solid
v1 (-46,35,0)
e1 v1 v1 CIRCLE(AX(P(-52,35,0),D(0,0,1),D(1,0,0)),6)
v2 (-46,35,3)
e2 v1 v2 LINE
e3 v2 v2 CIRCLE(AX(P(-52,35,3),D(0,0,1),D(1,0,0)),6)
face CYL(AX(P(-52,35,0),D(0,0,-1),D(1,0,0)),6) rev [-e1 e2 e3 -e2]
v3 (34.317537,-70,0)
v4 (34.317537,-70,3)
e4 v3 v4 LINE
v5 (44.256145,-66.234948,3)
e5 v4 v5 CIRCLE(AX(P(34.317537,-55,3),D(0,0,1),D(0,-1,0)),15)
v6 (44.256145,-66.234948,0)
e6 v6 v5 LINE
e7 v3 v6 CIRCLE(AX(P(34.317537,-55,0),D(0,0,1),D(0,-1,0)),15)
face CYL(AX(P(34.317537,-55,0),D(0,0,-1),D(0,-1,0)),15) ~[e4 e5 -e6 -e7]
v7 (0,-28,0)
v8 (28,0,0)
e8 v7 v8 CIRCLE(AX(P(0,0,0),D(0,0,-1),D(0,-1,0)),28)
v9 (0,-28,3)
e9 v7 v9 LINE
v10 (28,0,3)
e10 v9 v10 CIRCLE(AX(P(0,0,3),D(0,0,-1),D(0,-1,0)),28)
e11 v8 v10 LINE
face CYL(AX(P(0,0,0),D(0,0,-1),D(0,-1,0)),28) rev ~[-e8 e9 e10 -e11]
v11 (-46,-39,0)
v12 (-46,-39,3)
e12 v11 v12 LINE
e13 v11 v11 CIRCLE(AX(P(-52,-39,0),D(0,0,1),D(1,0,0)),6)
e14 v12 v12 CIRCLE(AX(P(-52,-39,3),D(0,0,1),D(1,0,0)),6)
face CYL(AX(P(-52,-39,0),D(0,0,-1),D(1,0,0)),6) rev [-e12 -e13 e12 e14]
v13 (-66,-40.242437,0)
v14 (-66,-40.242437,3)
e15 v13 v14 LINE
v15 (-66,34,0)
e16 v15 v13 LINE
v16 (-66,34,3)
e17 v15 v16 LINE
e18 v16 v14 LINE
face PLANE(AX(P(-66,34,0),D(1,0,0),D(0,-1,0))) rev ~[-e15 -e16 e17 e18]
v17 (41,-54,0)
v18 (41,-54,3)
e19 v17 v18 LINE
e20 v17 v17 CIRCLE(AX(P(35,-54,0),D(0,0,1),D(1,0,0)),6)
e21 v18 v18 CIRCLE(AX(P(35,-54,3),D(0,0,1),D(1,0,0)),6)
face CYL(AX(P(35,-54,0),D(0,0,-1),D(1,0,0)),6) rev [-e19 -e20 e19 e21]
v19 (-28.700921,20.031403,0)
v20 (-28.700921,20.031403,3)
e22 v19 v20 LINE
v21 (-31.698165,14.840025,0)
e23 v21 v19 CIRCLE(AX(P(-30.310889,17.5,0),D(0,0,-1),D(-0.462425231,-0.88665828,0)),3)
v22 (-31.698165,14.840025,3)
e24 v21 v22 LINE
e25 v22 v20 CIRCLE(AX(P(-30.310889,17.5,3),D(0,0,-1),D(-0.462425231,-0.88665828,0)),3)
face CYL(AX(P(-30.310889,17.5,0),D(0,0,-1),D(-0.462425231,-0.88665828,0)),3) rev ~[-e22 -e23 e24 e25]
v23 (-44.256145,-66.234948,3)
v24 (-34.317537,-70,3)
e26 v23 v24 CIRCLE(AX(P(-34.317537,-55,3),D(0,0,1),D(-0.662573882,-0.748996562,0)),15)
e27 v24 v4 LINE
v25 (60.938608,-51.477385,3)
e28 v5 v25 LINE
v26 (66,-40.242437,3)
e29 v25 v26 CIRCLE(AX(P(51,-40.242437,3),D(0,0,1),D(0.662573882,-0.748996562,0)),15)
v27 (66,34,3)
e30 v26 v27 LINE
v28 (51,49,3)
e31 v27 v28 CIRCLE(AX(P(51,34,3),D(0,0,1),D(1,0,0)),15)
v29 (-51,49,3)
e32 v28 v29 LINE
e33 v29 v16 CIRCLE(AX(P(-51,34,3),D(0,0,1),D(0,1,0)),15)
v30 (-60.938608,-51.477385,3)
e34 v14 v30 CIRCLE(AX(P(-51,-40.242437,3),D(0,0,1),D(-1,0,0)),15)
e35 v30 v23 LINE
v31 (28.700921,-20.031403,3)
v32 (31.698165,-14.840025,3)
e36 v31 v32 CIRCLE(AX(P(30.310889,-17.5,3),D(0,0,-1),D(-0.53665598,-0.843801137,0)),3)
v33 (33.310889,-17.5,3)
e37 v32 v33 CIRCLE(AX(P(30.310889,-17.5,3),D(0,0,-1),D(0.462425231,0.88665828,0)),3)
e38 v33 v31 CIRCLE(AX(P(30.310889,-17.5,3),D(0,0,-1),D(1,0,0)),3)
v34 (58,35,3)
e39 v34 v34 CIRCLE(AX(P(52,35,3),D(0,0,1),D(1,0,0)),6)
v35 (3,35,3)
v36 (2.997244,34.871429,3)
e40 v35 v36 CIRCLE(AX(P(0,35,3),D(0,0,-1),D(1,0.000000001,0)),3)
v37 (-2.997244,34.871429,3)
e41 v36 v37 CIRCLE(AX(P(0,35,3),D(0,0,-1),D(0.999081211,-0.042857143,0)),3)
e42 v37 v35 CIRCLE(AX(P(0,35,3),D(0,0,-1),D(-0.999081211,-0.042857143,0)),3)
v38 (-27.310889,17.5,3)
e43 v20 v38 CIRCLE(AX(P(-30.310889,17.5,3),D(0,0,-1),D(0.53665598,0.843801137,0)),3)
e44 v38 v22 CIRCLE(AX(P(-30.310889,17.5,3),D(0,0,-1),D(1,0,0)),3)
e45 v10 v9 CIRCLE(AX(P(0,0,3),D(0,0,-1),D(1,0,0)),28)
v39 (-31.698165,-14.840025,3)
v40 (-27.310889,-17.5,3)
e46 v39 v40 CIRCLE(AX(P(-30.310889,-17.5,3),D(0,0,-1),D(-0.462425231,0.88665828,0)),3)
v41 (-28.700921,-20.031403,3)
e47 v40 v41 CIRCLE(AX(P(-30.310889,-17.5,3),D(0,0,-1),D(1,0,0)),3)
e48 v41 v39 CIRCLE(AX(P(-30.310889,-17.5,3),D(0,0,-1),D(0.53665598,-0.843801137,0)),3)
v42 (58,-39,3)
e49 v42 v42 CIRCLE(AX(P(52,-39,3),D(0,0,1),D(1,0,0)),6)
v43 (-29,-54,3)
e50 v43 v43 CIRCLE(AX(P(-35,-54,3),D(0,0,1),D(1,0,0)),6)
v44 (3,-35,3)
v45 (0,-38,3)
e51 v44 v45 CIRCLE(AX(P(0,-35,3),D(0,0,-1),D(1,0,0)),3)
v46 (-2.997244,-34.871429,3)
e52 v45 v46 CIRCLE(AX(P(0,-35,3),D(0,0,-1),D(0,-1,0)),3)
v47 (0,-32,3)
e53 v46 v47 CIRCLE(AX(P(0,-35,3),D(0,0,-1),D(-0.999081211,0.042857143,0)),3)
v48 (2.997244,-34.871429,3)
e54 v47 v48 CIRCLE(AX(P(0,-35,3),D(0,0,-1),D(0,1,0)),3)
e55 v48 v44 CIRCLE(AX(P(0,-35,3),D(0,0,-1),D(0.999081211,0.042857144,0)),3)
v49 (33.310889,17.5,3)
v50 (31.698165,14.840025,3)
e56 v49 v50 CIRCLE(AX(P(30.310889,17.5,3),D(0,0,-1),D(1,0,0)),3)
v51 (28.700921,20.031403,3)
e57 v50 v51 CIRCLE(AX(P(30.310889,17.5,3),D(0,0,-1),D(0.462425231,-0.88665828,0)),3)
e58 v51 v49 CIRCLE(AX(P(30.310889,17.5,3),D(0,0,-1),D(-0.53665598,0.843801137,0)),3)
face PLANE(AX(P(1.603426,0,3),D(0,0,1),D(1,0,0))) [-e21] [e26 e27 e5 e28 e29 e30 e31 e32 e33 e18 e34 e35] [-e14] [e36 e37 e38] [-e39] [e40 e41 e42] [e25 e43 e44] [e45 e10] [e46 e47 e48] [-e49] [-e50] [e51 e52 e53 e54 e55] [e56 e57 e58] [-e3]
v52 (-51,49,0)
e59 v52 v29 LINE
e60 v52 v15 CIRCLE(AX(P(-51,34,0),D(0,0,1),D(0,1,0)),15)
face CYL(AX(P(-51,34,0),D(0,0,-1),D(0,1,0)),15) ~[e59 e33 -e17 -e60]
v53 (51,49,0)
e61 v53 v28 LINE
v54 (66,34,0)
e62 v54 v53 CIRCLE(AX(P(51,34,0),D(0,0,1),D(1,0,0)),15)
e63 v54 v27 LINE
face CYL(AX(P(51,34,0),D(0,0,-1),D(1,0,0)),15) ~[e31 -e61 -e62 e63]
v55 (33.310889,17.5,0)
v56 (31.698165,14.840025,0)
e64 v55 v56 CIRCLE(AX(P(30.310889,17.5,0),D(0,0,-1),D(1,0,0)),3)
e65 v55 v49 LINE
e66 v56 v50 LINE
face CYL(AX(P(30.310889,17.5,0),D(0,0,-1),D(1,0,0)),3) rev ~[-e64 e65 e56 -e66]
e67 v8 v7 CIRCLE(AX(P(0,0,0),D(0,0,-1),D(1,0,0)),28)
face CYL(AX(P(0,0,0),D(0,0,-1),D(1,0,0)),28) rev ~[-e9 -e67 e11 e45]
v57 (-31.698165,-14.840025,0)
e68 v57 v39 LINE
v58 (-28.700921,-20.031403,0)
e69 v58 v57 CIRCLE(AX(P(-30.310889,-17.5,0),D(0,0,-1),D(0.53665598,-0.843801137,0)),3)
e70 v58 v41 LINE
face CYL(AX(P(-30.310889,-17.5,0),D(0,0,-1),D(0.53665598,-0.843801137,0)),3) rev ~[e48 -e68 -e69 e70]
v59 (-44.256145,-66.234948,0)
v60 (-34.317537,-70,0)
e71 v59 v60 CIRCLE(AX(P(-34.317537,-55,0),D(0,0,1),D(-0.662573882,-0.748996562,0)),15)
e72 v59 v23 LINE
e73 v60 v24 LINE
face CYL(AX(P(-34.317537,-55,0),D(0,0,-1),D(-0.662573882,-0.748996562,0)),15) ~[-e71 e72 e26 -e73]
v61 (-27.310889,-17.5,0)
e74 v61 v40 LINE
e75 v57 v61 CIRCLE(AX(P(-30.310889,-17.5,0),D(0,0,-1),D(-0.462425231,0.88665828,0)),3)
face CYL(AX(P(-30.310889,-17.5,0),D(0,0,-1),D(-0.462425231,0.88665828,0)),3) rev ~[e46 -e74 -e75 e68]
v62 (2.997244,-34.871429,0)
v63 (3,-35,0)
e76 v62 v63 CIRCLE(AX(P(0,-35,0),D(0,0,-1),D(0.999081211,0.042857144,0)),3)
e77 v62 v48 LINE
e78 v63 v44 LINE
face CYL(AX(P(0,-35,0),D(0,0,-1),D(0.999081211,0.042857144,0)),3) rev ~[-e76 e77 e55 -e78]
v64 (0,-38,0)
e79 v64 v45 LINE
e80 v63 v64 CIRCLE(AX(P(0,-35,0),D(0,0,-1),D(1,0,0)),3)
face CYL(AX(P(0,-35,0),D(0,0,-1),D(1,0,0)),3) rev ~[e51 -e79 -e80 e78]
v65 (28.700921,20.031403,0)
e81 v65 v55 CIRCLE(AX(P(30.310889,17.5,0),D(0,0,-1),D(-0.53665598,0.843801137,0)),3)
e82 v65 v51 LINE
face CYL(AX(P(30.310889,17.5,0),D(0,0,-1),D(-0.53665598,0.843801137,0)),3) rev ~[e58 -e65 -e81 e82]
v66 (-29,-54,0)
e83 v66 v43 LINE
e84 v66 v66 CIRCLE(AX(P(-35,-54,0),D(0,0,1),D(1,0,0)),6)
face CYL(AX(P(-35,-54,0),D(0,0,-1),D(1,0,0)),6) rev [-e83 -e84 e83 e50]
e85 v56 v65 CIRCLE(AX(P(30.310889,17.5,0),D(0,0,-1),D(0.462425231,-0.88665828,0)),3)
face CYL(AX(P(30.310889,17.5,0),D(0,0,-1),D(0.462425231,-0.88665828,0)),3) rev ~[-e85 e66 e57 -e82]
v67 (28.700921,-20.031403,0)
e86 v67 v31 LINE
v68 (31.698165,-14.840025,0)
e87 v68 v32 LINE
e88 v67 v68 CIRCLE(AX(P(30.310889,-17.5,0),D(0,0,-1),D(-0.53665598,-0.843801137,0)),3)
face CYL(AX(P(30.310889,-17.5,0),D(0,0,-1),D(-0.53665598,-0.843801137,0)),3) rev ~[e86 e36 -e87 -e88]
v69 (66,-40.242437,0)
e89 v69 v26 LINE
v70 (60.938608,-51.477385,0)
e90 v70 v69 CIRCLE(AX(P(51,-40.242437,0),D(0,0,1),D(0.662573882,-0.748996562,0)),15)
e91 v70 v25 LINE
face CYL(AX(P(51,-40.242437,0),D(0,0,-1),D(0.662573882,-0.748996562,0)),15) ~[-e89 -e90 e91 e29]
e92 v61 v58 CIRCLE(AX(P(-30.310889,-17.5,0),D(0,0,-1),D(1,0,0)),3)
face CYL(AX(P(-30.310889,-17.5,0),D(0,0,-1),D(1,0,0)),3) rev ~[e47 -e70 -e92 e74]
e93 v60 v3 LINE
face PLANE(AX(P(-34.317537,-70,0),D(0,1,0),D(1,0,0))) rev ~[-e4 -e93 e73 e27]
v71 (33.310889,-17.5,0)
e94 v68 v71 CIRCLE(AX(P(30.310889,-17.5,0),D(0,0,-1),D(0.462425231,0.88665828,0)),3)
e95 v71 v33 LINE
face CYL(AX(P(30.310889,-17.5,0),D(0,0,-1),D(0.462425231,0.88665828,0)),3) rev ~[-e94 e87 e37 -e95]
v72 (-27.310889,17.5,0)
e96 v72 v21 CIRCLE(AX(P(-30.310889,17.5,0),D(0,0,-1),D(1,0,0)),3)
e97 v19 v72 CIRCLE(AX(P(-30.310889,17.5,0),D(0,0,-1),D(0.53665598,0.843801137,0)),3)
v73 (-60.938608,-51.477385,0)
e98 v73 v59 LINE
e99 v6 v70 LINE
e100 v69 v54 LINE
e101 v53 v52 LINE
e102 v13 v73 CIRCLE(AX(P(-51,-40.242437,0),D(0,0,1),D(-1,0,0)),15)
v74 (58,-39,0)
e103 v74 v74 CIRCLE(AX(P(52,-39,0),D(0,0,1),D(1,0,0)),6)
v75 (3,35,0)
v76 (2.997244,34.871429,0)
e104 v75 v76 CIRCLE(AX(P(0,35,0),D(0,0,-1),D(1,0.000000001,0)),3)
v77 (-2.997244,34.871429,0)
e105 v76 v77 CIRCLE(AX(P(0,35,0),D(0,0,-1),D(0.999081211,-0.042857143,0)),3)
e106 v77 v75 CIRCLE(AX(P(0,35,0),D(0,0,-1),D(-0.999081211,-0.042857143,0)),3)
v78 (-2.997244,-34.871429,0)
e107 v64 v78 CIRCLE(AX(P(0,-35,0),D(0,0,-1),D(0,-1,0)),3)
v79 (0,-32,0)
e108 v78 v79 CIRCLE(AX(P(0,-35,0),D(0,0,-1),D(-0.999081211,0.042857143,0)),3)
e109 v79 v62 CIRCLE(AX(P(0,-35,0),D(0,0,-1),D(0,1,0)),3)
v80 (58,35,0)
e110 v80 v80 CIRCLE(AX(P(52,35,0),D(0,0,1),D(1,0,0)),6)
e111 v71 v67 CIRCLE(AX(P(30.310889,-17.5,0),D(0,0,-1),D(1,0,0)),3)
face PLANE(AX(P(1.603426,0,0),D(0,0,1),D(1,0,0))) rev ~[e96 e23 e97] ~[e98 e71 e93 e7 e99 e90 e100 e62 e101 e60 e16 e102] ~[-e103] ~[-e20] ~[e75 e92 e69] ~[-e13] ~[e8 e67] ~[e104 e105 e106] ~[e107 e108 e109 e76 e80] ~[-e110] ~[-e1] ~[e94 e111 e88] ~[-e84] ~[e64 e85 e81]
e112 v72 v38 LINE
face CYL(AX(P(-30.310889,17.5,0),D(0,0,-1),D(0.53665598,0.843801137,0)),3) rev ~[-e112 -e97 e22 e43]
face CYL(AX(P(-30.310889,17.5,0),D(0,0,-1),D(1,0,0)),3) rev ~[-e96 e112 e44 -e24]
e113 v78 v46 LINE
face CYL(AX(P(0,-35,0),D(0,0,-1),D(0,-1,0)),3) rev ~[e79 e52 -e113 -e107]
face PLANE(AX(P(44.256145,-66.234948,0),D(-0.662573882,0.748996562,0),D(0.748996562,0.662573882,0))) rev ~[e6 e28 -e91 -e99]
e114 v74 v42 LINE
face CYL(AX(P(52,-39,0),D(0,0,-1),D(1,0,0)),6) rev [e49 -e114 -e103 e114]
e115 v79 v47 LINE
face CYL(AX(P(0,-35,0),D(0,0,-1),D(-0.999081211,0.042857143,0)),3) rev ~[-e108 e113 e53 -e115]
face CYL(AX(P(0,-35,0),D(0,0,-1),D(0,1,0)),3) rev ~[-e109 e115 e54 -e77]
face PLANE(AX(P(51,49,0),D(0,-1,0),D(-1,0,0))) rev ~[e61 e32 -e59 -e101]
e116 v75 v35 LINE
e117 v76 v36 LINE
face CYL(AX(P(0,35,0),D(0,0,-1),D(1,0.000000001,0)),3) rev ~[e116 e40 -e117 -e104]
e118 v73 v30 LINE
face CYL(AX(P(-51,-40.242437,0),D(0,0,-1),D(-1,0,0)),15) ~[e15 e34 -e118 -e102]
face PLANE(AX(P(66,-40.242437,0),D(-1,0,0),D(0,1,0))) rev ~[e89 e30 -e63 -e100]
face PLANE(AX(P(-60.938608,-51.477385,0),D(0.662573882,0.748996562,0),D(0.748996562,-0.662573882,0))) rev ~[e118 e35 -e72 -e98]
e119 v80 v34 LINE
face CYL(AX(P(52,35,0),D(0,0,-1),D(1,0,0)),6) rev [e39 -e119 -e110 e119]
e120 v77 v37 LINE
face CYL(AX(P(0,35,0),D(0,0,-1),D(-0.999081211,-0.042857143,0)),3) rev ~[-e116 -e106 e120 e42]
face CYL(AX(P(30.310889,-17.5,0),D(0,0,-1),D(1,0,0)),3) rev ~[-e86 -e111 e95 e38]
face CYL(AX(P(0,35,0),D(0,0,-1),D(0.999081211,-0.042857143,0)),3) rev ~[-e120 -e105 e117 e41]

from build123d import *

# Parameters (mm, degrees)
F0_R     = 9
F0_R_2   = 6
F1_DEPTH = 3


# Not quite as in the source:
# - a feature names something its author has since deleted; it is built from what else it names


with BuildPart() as f1:
    # F0 (on Top) → F1 (new body)
    with BuildSketch(Plane.XY):
        with BuildLine():
            ThreePointArc((0, 49), (-49, 0), (0, -49))
            ThreePointArc((0, -49), (34.6482322781, -34.6482322781), (49, 0))
            ThreePointArc((49, 0), (34.6482322781, 34.6482322781), (0, 49))
        make_face()
        with BuildLine():
            ThreePointArc((31.698164825, 14.8400251593), (34.1645706023, 7.601454832), (35, 0))
            ThreePointArc((35, 0), (34.1645706023, -7.601454832), (31.698164825, -14.8400251593))
            ThreePointArc((31.698164825, -14.8400251593), (32.8762182612, -15.9446587316), (33.3108891325, -17.5))
            ThreePointArc((33.3108891325, -17.5), (31.7548586928, -20.1296296144), (28.7009211933, -20.0314034121))
            ThreePointArc((28.7009211933, -20.0314034121), (17.5, -30.3108891325), (2.9972436317, -34.8714285714))
            ThreePointArc((2.9972436317, -34.8714285714), (2.9993108288, -34.9356995144), (3, -35))
            ThreePointArc((3, -35), (2.1213203436, -37.1213203436), (0, -38))
            ThreePointArc((0, -38), (-2.1663003353, -37.0753657165), (-2.9972436317, -34.8714285714))
            ThreePointArc((-2.9972436317, -34.8714285714), (-17.5, -30.3108891325), (-28.7009211933, -20.0314034121))
            ThreePointArc((-28.7009211933, -20.0314034121), (-32.9089653438, -19), (-31.698164825, -14.8400251593))
            ThreePointArc((-31.698164825, -14.8400251593), (-35, 0), (-31.698164825, 14.8400251593))
            ThreePointArc((-31.698164825, 14.8400251593), (-32.9089653438, 19), (-28.7009211933, 20.0314034121))
            ThreePointArc((-28.7009211933, 20.0314034121), (-17.5, 30.3108891325), (-2.9972436317, 34.8714285714))
            ThreePointArc((-2.9972436317, 34.8714285714), (-0.0643004856, 37.9993108288), (3, 35))
            ThreePointArc((3, 35), (2.9993108288, 34.9356995144), (2.9972436317, 34.8714285714))
            ThreePointArc((2.9972436317, 34.8714285714), (17.5, 30.3108891325), (28.7009211933, 20.0314034121))
            ThreePointArc((28.7009211933, 20.0314034121), (31.7548586928, 20.1296296144), (33.3108891325, 17.5))
            ThreePointArc((33.3108891325, 17.5), (32.8762182612, 15.9446587316), (31.698164825, 14.8400251593))
        make_face(mode=Mode.SUBTRACT)
        with BuildLine():
            ThreePointArc((31.698164825, -14.8400251593), (34.1645706023, -7.601454832), (35, 0))
            ThreePointArc((35, 0), (34.1645706023, 7.601454832), (31.698164825, 14.8400251593))
            ThreePointArc((31.698164825, 14.8400251593), (27.7128129211, 16), (28.7009211933, 20.0314034121))
            ThreePointArc((28.7009211933, 20.0314034121), (17.5, 30.3108891325), (2.9972436317, 34.8714285714))
            ThreePointArc((2.9972436317, 34.8714285714), (0, 32), (-2.9972436317, 34.8714285714))
            ThreePointArc((-2.9972436317, 34.8714285714), (-17.5, 30.3108891325), (-28.7009211933, 20.0314034121))
            ThreePointArc((-28.7009211933, 20.0314034121), (-27.6812595181, 18.9439695603), (-27.3108891325, 17.5))
            ThreePointArc((-27.3108891325, 17.5), (-28.755547864, 14.9346708713), (-31.698164825, 14.8400251593))
            ThreePointArc((-31.698164825, 14.8400251593), (-35, 0), (-31.698164825, -14.8400251593))
            ThreePointArc((-31.698164825, -14.8400251593), (-28.755547864, -14.9346708713), (-27.3108891325, -17.5))
            ThreePointArc((-27.3108891325, -17.5), (-27.6812595181, -18.9439695603), (-28.7009211933, -20.0314034121))
            ThreePointArc((-28.7009211933, -20.0314034121), (-17.5, -30.3108891325), (-2.9972436317, -34.8714285714))
            ThreePointArc((-2.9972436317, -34.8714285714), (-2.0753657165, -32.8336996647), (0, -32))
            ThreePointArc((0, -32), (2.0753657165, -32.8336996647), (2.9972436317, -34.8714285714))
            ThreePointArc((2.9972436317, -34.8714285714), (17.5, -30.3108891325), (28.7009211933, -20.0314034121))
            ThreePointArc((28.7009211933, -20.0314034121), (27.7128129211, -16), (31.698164825, -14.8400251593))
        make_face()
        with BuildLine():
            ThreePointArc((28, 0), (19.7989898732, -19.7989898732), (0, -28))
            ThreePointArc((0, -28), (-19.7989898732, 19.7989898732), (28, 0))
        make_face(mode=Mode.SUBTRACT)
        with BuildLine():
            Line((0, -70), (0, -49))
            ThreePointArc((0, -49), (-49, 0), (0, 49))
            Line((0, 49), (-51, 49))
            ThreePointArc((-51, 49), (-61.6066017178, 44.6066017178), (-66, 34))
            Line((-66, 34), (-66, -40.2424365873))
            ThreePointArc((-66, -40.2424365873), (-64.6762407754, -46.4036408731), (-60.938608233, -51.4773850246))
            Line((-60.938608233, -51.4773850246), (-44.2561452447, -66.2349484374))
            ThreePointArc((-44.2561452447, -66.2349484374), (-39.6314702743, -69.0271919243), (-34.3175370117, -70))
            Line((-34.3175370117, -70), (0, -70))
        make_face()
        with Locations((-35, -54)):
            Circle(F0_R, mode=Mode.SUBTRACT)
        with Locations((-52, -39)):
            Circle(F0_R, mode=Mode.SUBTRACT)
        with Locations((-52, 35)):
            Circle(F0_R, mode=Mode.SUBTRACT)
        with BuildLine():
            ThreePointArc((49, 0), (34.6482322781, -34.6482322781), (0, -49))
            Line((0, -49), (0, -70))
            Line((0, -70), (34.3175370117, -70))
            ThreePointArc((34.3175370117, -70), (39.6314702743, -69.0271919243), (44.2561452447, -66.2349484374))
            Line((44.2561452447, -66.2349484374), (60.938608233, -51.4773850246))
            ThreePointArc((60.938608233, -51.4773850246), (64.6762407754, -46.4036408731), (66, -40.2424365873))
            Line((66, -40.2424365873), (66, 34))
            ThreePointArc((66, 34), (61.6066017178, 44.6066017178), (51, 49))
            Line((51, 49), (0, 49))
            ThreePointArc((0, 49), (34.6482322781, 34.6482322781), (49, 0))
        make_face()
        with Locations((35, -54)):
            Circle(F0_R, mode=Mode.SUBTRACT)
        with Locations((52, -39)):
            Circle(F0_R, mode=Mode.SUBTRACT)
        with Locations((52, 35)):
            Circle(F0_R, mode=Mode.SUBTRACT)
        with Locations((-52, 35)):
            Circle(F0_R)
        with Locations((-52, 35)):
            Circle(F0_R_2, mode=Mode.SUBTRACT)
        with Locations((-52, -39)):
            Circle(F0_R)
        with Locations((-52, -39)):
            Circle(F0_R_2, mode=Mode.SUBTRACT)
        with Locations((-35, -54)):
            Circle(F0_R)
        with Locations((-35, -54)):
            Circle(F0_R_2, mode=Mode.SUBTRACT)
        with Locations((35, -54)):
            Circle(F0_R)
        with Locations((35, -54)):
            Circle(F0_R_2, mode=Mode.SUBTRACT)
        with Locations((52, -39)):
            Circle(F0_R)
        with Locations((52, -39)):
            Circle(F0_R_2, mode=Mode.SUBTRACT)
        with Locations((52, 35)):
            Circle(F0_R)
        with Locations((52, 35)):
            Circle(F0_R_2, mode=Mode.SUBTRACT)
    extrude(amount=F1_DEPTH)


solid = f1.part
